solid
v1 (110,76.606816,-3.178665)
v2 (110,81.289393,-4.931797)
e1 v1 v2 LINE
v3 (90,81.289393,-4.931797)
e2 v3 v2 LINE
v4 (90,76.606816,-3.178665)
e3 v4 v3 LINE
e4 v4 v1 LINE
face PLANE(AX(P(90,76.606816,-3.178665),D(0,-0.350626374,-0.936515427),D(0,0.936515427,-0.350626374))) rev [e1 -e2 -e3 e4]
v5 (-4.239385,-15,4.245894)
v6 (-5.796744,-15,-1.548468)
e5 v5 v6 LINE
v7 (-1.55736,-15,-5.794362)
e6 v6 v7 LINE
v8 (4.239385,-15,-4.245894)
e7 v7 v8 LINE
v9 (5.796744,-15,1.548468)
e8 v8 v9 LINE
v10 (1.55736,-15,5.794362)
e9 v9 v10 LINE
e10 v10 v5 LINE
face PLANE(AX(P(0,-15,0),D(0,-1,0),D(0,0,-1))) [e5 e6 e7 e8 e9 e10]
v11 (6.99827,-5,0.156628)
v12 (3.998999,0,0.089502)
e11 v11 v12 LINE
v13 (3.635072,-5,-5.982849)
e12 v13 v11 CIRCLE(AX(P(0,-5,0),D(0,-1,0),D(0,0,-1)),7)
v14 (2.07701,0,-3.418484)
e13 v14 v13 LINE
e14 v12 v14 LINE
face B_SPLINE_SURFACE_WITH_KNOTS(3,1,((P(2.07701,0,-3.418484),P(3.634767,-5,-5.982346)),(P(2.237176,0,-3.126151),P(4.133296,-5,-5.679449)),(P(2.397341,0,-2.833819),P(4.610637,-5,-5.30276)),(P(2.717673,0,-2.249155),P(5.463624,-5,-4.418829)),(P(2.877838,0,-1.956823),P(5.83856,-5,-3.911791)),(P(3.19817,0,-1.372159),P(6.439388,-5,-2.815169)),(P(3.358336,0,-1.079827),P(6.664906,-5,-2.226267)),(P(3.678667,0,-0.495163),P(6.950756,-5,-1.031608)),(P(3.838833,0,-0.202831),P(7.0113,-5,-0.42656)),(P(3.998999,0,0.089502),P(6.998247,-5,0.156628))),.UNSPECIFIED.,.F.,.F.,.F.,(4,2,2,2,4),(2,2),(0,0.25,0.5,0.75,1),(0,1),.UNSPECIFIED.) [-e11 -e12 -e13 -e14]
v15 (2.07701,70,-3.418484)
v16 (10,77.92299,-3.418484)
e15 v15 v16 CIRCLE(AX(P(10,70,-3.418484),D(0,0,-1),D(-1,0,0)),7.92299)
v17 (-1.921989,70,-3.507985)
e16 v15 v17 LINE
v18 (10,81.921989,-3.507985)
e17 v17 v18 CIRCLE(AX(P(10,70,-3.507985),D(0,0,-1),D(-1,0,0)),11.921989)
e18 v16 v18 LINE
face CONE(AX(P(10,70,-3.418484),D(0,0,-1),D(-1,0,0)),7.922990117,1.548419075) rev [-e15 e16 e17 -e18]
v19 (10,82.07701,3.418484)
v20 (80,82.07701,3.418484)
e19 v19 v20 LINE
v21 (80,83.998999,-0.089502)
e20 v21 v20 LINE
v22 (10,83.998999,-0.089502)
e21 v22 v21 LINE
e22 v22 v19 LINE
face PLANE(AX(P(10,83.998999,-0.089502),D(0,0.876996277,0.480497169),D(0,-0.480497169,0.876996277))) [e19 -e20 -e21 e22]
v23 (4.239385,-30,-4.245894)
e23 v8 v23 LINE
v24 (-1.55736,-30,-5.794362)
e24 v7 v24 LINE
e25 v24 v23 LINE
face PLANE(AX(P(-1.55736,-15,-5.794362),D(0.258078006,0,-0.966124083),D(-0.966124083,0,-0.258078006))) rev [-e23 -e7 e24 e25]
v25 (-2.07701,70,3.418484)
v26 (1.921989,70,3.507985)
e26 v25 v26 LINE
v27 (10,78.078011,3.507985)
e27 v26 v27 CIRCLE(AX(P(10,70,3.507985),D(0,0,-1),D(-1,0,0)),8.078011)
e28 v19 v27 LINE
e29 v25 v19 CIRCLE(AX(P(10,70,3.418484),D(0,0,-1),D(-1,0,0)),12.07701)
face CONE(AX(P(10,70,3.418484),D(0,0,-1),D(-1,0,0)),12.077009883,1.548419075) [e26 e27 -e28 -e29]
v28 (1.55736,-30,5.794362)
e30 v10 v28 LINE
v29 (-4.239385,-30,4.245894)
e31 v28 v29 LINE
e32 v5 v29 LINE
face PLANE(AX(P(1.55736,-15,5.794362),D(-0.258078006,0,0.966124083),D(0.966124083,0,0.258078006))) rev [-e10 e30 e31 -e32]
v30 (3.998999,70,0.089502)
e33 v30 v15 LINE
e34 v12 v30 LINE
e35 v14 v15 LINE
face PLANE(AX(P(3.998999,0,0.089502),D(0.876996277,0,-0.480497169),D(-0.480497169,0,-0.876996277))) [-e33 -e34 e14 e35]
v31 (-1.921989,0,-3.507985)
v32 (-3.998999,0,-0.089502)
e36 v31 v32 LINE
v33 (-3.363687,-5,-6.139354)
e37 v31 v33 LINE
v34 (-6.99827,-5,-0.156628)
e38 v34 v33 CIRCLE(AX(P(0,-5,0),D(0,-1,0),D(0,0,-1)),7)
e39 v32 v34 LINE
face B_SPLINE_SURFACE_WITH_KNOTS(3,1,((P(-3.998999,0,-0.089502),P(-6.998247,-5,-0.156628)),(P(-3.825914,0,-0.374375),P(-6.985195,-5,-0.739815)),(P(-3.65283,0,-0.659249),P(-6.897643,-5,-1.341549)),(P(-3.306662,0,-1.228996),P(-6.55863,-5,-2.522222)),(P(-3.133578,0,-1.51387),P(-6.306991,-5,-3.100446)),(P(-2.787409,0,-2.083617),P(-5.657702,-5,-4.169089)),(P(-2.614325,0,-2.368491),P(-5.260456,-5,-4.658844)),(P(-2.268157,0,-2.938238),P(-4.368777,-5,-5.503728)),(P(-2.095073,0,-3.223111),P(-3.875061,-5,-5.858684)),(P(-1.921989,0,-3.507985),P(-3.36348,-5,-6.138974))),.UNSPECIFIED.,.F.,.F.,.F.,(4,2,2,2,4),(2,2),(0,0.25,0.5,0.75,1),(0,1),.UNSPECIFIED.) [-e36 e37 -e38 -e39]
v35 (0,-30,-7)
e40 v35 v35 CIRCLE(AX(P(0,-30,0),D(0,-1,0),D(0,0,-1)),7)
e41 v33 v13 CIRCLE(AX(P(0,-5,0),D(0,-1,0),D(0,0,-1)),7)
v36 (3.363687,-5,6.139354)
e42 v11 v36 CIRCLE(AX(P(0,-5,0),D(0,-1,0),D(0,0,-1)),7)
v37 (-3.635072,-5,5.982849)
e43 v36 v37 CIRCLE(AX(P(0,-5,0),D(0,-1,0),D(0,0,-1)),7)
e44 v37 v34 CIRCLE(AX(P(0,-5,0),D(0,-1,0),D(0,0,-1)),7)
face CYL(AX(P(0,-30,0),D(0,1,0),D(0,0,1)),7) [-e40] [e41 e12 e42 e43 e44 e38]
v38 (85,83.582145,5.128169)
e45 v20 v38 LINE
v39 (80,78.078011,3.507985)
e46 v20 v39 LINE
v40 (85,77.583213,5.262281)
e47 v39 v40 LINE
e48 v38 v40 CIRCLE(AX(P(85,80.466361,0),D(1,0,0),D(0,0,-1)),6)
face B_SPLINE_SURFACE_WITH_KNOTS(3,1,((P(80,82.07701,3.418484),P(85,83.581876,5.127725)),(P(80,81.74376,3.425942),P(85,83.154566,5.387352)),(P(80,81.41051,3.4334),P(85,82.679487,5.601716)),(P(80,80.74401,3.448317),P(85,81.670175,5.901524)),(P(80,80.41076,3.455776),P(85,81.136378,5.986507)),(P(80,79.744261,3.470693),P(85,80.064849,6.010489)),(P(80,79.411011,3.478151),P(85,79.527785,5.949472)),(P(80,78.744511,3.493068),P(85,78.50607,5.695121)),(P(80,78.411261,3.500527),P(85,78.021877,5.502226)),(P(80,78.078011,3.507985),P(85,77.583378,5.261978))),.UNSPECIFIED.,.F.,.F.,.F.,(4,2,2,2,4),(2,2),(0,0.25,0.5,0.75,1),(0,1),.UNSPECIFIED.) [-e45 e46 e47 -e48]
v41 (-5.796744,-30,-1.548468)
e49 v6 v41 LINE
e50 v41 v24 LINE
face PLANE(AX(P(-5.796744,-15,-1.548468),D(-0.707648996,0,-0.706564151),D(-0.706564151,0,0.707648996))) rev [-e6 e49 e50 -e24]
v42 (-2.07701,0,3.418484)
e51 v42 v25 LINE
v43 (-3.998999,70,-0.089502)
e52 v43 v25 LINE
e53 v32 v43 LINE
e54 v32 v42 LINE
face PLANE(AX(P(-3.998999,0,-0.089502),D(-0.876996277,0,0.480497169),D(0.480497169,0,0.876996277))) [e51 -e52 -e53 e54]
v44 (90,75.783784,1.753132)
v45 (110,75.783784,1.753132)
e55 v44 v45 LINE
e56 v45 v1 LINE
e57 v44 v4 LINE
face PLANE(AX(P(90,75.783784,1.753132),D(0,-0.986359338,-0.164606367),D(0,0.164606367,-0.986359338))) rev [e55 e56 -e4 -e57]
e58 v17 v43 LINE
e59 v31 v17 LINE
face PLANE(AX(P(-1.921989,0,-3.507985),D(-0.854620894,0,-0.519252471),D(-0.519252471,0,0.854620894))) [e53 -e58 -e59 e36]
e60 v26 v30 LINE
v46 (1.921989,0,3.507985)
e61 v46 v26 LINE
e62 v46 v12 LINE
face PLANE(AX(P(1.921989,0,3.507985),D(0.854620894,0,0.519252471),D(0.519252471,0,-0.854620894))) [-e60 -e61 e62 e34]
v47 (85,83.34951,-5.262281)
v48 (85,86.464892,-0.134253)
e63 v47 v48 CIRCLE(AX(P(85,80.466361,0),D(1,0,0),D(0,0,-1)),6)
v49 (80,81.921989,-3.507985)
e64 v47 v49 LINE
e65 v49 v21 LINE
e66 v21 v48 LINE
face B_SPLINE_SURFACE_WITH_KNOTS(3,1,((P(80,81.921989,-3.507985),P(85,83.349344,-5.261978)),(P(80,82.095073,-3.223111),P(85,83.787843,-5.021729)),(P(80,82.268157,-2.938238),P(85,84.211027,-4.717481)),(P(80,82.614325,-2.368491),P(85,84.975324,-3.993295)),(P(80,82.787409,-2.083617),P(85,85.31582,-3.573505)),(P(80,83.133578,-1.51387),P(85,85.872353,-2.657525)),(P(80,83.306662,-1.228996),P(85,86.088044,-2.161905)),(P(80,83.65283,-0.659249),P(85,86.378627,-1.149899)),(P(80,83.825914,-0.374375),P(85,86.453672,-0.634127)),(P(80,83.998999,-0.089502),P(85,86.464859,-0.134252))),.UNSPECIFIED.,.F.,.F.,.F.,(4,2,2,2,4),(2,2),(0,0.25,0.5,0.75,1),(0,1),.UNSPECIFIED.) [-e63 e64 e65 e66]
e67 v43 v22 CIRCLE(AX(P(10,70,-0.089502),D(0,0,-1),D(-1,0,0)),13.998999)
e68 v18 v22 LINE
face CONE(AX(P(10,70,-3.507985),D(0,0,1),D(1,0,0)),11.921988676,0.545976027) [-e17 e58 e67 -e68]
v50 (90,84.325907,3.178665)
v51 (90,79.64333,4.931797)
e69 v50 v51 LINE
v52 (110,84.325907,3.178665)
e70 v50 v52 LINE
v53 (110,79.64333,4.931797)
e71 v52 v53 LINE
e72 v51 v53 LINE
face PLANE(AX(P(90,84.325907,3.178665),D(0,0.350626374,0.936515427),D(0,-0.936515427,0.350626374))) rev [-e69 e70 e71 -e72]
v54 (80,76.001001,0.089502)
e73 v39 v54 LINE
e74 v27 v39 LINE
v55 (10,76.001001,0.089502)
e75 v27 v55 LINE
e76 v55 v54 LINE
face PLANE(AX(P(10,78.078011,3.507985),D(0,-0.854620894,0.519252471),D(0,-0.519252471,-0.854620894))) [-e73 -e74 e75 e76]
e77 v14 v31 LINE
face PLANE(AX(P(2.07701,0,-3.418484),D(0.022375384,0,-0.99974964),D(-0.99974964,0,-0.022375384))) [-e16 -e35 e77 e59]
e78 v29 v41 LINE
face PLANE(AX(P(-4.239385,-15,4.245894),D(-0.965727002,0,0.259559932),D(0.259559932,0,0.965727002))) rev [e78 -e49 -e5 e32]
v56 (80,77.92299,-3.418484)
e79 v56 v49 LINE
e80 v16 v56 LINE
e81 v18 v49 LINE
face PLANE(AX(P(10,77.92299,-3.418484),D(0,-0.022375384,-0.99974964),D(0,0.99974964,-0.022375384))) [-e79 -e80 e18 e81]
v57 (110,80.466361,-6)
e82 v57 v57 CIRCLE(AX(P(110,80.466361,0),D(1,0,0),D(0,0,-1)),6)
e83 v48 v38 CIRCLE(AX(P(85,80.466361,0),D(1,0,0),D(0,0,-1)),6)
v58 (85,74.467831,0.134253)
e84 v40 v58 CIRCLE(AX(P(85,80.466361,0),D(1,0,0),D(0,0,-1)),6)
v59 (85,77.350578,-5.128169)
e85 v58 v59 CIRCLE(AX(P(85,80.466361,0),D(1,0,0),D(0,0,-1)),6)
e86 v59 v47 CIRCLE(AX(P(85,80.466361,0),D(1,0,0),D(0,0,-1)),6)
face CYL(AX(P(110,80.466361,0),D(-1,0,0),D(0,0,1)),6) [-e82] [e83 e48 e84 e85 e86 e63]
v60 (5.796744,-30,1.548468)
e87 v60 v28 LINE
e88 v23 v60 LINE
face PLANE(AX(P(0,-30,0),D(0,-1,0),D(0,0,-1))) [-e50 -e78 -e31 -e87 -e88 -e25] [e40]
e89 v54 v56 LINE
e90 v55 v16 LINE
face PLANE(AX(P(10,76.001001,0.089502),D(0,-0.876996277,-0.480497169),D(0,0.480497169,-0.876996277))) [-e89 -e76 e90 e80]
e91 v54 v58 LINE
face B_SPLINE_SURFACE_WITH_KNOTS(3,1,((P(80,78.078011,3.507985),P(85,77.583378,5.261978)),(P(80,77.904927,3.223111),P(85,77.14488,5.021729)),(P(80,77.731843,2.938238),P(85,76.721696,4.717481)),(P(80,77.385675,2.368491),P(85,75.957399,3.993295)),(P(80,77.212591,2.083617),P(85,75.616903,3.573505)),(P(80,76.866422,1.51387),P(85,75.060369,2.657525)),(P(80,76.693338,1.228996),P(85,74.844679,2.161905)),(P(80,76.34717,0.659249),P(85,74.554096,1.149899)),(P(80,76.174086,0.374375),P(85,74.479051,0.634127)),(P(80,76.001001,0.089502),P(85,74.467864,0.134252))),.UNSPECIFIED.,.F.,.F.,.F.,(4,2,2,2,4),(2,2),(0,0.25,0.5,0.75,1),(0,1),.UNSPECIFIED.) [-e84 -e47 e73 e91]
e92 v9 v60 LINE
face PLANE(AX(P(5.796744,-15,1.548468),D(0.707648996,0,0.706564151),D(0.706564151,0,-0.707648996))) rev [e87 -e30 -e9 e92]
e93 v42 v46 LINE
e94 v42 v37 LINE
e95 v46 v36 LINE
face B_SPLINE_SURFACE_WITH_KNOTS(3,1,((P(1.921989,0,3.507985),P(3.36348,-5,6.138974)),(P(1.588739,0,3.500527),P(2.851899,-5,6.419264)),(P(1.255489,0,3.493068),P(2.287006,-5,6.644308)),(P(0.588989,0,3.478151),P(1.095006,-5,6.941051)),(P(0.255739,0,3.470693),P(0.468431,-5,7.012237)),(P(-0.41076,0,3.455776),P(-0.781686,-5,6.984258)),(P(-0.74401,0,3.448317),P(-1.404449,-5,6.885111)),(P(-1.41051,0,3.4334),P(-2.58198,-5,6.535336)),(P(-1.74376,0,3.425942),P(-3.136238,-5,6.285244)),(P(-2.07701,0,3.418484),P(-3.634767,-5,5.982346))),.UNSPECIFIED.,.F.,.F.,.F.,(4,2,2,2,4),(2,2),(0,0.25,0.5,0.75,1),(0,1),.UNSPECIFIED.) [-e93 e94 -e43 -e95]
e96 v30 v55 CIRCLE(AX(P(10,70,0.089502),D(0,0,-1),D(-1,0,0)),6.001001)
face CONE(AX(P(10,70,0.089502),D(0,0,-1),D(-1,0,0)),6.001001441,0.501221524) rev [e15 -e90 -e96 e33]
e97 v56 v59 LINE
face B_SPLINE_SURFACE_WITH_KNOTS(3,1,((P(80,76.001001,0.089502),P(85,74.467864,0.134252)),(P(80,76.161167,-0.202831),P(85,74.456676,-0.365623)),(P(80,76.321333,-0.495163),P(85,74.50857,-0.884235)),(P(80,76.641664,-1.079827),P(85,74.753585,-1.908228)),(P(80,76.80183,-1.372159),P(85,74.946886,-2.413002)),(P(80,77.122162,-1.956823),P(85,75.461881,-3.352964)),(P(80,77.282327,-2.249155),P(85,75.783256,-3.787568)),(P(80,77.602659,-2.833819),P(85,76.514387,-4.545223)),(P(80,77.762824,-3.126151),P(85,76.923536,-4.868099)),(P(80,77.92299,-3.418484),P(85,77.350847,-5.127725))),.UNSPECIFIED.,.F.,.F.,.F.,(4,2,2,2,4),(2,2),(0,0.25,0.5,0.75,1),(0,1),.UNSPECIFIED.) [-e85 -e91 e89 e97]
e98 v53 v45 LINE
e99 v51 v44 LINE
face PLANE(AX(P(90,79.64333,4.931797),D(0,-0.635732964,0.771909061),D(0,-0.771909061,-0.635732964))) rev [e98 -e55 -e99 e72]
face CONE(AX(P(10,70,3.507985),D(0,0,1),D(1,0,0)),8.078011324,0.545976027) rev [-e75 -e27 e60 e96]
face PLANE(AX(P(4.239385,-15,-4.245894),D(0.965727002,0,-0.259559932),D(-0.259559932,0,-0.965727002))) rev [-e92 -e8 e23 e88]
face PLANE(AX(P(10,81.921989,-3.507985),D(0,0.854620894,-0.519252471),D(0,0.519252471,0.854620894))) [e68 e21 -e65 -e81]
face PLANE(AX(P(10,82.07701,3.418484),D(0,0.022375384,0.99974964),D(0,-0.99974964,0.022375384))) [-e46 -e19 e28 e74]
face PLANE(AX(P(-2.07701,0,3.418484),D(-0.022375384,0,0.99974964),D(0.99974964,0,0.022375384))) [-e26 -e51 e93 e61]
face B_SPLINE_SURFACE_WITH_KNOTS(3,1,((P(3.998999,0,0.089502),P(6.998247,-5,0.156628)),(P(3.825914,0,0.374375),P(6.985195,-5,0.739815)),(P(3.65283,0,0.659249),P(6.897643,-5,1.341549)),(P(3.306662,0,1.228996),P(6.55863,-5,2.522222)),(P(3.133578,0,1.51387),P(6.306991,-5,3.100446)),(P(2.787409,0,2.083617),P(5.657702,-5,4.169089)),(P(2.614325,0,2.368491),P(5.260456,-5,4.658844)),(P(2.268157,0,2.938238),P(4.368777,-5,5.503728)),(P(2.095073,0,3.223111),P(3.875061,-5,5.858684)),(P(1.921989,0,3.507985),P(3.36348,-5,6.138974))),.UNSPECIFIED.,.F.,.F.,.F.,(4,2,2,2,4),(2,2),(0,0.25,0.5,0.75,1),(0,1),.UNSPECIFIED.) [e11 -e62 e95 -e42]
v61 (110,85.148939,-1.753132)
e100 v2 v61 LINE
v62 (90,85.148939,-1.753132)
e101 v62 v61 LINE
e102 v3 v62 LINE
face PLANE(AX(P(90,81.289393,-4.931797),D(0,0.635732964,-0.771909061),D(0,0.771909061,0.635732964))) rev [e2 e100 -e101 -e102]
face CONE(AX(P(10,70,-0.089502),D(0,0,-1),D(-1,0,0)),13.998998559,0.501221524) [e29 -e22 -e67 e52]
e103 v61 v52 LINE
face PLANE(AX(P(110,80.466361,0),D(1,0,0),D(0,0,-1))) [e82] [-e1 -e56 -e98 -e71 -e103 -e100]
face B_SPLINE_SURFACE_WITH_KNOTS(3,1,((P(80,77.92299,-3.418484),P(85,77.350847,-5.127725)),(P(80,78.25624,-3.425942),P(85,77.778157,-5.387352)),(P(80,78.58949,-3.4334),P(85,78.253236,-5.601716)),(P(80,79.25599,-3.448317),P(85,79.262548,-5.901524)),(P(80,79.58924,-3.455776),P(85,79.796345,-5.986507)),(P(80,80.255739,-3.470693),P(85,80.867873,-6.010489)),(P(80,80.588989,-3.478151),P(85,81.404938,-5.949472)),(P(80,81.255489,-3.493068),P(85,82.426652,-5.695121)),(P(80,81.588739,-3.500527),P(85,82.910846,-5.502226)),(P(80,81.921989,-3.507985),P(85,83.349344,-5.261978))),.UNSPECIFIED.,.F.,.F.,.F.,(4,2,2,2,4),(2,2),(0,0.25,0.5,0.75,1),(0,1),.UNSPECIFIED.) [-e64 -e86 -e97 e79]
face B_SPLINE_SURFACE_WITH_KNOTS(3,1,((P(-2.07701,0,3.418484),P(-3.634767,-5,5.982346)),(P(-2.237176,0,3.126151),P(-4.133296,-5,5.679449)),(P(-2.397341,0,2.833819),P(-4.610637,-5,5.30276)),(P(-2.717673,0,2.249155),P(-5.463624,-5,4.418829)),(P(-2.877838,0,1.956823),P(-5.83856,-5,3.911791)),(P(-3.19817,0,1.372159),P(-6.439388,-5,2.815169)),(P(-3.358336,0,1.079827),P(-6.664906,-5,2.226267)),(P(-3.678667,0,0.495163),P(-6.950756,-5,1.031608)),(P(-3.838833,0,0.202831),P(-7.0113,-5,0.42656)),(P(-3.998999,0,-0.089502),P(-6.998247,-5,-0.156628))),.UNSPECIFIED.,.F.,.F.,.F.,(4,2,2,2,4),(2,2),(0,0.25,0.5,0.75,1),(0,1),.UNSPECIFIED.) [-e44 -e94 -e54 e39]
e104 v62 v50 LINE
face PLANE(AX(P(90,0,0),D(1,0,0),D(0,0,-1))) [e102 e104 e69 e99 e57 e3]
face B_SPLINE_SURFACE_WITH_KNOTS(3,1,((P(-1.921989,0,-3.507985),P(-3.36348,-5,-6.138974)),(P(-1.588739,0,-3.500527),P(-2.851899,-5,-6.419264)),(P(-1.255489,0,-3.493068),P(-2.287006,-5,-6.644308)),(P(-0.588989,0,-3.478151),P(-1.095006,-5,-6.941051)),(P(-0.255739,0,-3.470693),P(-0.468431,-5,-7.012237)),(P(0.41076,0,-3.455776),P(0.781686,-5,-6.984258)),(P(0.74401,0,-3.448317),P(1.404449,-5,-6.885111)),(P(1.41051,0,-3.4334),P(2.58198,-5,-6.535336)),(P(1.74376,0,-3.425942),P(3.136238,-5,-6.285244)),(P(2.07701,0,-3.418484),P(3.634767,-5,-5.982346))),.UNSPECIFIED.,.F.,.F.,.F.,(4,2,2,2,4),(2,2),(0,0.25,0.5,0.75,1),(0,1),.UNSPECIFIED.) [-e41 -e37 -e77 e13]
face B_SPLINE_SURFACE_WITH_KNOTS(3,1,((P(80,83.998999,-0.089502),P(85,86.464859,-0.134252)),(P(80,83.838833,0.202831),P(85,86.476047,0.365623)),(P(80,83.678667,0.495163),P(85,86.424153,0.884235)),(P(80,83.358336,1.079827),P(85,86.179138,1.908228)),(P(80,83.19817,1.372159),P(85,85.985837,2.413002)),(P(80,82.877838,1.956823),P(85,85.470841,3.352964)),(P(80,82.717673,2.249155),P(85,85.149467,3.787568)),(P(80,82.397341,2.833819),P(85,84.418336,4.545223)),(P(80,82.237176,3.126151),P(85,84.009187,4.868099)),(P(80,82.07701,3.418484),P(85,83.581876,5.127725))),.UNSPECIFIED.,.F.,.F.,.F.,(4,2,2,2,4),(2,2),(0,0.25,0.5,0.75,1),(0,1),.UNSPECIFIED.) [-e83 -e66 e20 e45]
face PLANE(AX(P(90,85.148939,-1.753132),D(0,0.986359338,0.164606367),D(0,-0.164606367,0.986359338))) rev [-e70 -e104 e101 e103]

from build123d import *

# Parameters (mm, degrees)
SZKIC11_R                   = 6
DODANIE_WYCI_GNI_CIE2_DEPTH = 25
WYTNIJ_WYCI_GNI_CIE1_DEPTH  = 20
SZKIC17_R                   = 7
DODANIE_WYCI_GNI_CIE4_DEPTH = 25
WYTNIJ_WYCI_GNI_CIE2_DEPTH  = 15


with BuildPart() as part:
    # Wyciągnięcie po ścieżce3: sweep along a path in Szkic1
    with BuildLine(Plane.XY) as wyci_gni_cie_po_cie_ce3_path:
        Line((0, 0), (0, 70))
        ThreePointArc((0, 70), (2.928932188, 77.071067812), (10, 80))
        Line((10, 80), (80, 80))
    # Szkic3 → Wyciągnięcie po ścieżce3 (sweep)
    with BuildSketch(Plane(origin=(0, 0, 0), x_dir=(1, 0, 0), z_dir=(0, 1, 0))):
        Polygon((-1.921988676, 3.50798511), (-3.998998559, 0.089501536), (-2.077009883, -3.418483574), (1.921988676, -3.50798511), (3.998998559, -0.089501536), (2.077009883, 3.418483574), align=None)
    sweep(path=wyci_gni_cie_po_cie_ce3_path.line)

    # Wyciągnięcie po profilach3: read off the stored shape, not the designer's step
    # Wyciągnięcie po profilach3: loft between two sections, ruled curve by curve
    wyci_gni_cie_po_profilach3_from = [
        Edge.make_bspline([(80, 81.921988676, -3.50798511), (80, 82.095072833, -3.223111478), (80, 82.26815699, -2.938237847), (80, 82.614325304, -2.368490585), (80, 82.787409461, -2.083616954), (80, 83.133577774, -1.513869691), (80, 83.306661931, -1.22899606), (80, 83.652830245, -0.659248798), (80, 83.825914402, -0.374375167), (80, 83.998998559, -0.089501536)], [0, 0, 0, 0, 0.25, 0.25, 0.5, 0.5, 0.75, 0.75, 1, 1, 1, 1], 3),
        Edge.make_bspline([(80, 83.998998559, -0.089501536), (80, 83.838832836, 0.202830557), (80, 83.678667113, 0.495162649), (80, 83.358335667, 1.079826834), (80, 83.198169944, 1.372158927), (80, 82.877838498, 1.956823112), (80, 82.717672775, 2.249155204), (80, 82.397341329, 2.833819389), (80, 82.237175606, 3.126151482), (80, 82.077009883, 3.418483574)], [0, 0, 0, 0, 0.25, 0.25, 0.5, 0.5, 0.75, 0.75, 1, 1, 1, 1], 3),
        Edge.make_bspline([(80, 77.922990117, -3.418483574), (80, 78.256239997, -3.425942035), (80, 78.589489877, -3.433400497), (80, 79.255989637, -3.448317419), (80, 79.589239517, -3.455775881), (80, 80.255739276, -3.470692803), (80, 80.588989156, -3.478151264), (80, 81.255488916, -3.493068187), (80, 81.588738796, -3.500526648), (80, 81.921988676, -3.50798511)], [0, 0, 0, 0, 0.25, 0.25, 0.5, 0.5, 0.75, 0.75, 1, 1, 1, 1], 3),
        Edge.make_bspline([(80, 82.077009883, 3.418483574), (80, 81.743760003, 3.425942035), (80, 81.410510123, 3.433400497), (80, 80.744010363, 3.448317419), (80, 80.410760483, 3.455775881), (80, 79.744260724, 3.470692803), (80, 79.411010844, 3.478151264), (80, 78.744511084, 3.493068187), (80, 78.411261204, 3.500526648), (80, 78.078011324, 3.50798511)], [0, 0, 0, 0, 0.25, 0.25, 0.5, 0.5, 0.75, 0.75, 1, 1, 1, 1], 3),
        Edge.make_bspline([(80, 78.078011324, 3.50798511), (80, 77.904927167, 3.223111478), (80, 77.73184301, 2.938237847), (80, 77.385674696, 2.368490585), (80, 77.212590539, 2.083616954), (80, 76.866422226, 1.513869691), (80, 76.693338069, 1.22899606), (80, 76.347169755, 0.659248798), (80, 76.174085598, 0.374375167), (80, 76.001001441, 0.089501536)], [0, 0, 0, 0, 0.25, 0.25, 0.5, 0.5, 0.75, 0.75, 1, 1, 1, 1], 3),
        Edge.make_bspline([(80, 76.001001441, 0.089501536), (80, 76.161167164, -0.202830557), (80, 76.321332887, -0.495162649), (80, 76.641664333, -1.079826834), (80, 76.801830056, -1.372158927), (80, 77.122161502, -1.956823112), (80, 77.282327225, -2.249155204), (80, 77.602658671, -2.833819389), (80, 77.762824394, -3.126151482), (80, 77.922990117, -3.418483574)], [0, 0, 0, 0, 0.25, 0.25, 0.5, 0.5, 0.75, 0.75, 1, 1, 1, 1], 3),
    ]
    wyci_gni_cie_po_profilach3_to = [
        Edge.make_bspline([(85, 83.349344408, -5.261977664), (85, 83.787842547, -5.02172908), (85, 84.211027249, -4.717480921), (85, 84.975323877, -3.993295122), (85, 85.315820195, -3.573504781), (85, 85.872353316, -2.657524868), (85, 86.088044053, -2.161904874), (85, 86.37862671, -1.149898883), (85, 86.453671541, -0.634127123), (85, 86.464859233, -0.134252303)], [0, 0, 0, 0, 0.25, 0.25, 0.5, 0.5, 0.75, 0.75, 1, 1, 1, 1], 3),
        Edge.make_bspline([(85, 86.464859233, -0.134252303), (85, 86.476046925, 0.365622516), (85, 86.424152641, 0.884235299), (85, 86.179137656, 1.908228494), (85, 85.985836715, 2.413002125), (85, 85.470841402, 3.352963903), (85, 85.149467265, 3.787567557), (85, 84.418335696, 4.545222516), (85, 84.009186666, 4.868099126), (85, 83.581876219, 5.127725361)], [0, 0, 0, 0, 0.25, 0.25, 0.5, 0.5, 0.75, 0.75, 1, 1, 1, 1], 3),
        Edge.make_bspline([(85, 77.35084657, -5.127725361), (85, 77.778157016, -5.387351596), (85, 78.253236002, -5.601716219), (85, 79.262547615, -5.901523616), (85, 79.796344874, -5.986506906), (85, 80.867873308, -6.010488771), (85, 81.404938182, -5.949472432), (85, 82.426652408, -5.695121399), (85, 82.91084627, -5.502226249), (85, 83.349344408, -5.261977664)], [0, 0, 0, 0, 0.25, 0.25, 0.5, 0.5, 0.75, 0.75, 1, 1, 1, 1], 3),
        Edge.make_bspline([(85, 83.581876219, 5.127725361), (85, 83.154565772, 5.387351596), (85, 82.679486786, 5.601716219), (85, 81.670175173, 5.901523616), (85, 81.136377915, 5.986506906), (85, 80.06484948, 6.010488771), (85, 79.527784606, 5.949472432), (85, 78.506070381, 5.695121399), (85, 78.021876519, 5.502226249), (85, 77.58337838, 5.261977664)], [0, 0, 0, 0, 0.25, 0.25, 0.5, 0.5, 0.75, 0.75, 1, 1, 1, 1], 3),
        Edge.make_bspline([(85, 77.58337838, 5.261977664), (85, 77.144880242, 5.02172908), (85, 76.721695539, 4.717480921), (85, 75.957398911, 3.993295122), (85, 75.616902594, 3.573504781), (85, 75.060369473, 2.657524868), (85, 74.844678735, 2.161904874), (85, 74.554096079, 1.149898883), (85, 74.479051248, 0.634127123), (85, 74.467863556, 0.134252303)], [0, 0, 0, 0, 0.25, 0.25, 0.5, 0.5, 0.75, 0.75, 1, 1, 1, 1], 3),
        Edge.make_bspline([(85, 74.467863556, 0.134252303), (85, 74.456675864, -0.365622516), (85, 74.508570148, -0.884235299), (85, 74.753585133, -1.908228494), (85, 74.946886073, -2.413002125), (85, 75.461881387, -3.352963903), (85, 75.783255523, -3.787567557), (85, 76.514387092, -4.545222516), (85, 76.923536123, -4.868099126), (85, 77.35084657, -5.127725361)], [0, 0, 0, 0, 0.25, 0.25, 0.5, 0.5, 0.75, 0.75, 1, 1, 1, 1], 3),
    ]
    wyci_gni_cie_po_profilach3 = Solid(Shell([*[Face.make_surface_from_curves(wyci_gni_cie_po_profilach3_from[k], wyci_gni_cie_po_profilach3_to[k]) for k in range(6)], Face(Wire(wyci_gni_cie_po_profilach3_from)), Face(Wire(wyci_gni_cie_po_profilach3_to))]))
    add(wyci_gni_cie_po_profilach3)

    # Szkic11 → Dodanie-wyciągnięcie2 (add)
    with BuildSketch(Plane(origin=(85, 0, 0), x_dir=(0, 0, -1), z_dir=(1, 0, 0))):
        with Locations(Location((0, 80.466361394, 0), (0, 0, 208.71786867))):
            Circle(SZKIC11_R)
    extrude(amount=DODANIE_WYCI_GNI_CIE2_DEPTH)

    # Szkic12 → Wytnij-wyciągnięcie1 (cut)
    with BuildSketch(Plane(origin=(110, 0, 0), x_dir=(0, 0, -1), z_dir=(1, 0, 0))):
        Polygon((-3.178664822, 84.325906698), (-4.931796691, 79.643329561), (-1.753131869, 75.783784257), (3.178664822, 76.60681609), (4.931796691, 81.289393228), (1.753131869, 85.148938532), align=None)
    extrude(amount=-WYTNIJ_WYCI_GNI_CIE1_DEPTH, mode=Mode.SUBTRACT)

    # Wyciągnięcie po profilach4: read off the stored shape, not the designer's step
    # Wyciągnięcie po profilach4: loft between two sections, ruled curve by curve
    wyci_gni_cie_po_profilach4_from = [
        Edge.make_bspline([(3.998998559, 0, 0.089501536), (3.825914402, 0, 0.374375167), (3.652830245, 0, 0.659248798), (3.306661931, 0, 1.22899606), (3.133577774, 0, 1.513869691), (2.787409461, 0, 2.083616954), (2.614325304, 0, 2.368490585), (2.26815699, 0, 2.938237847), (2.095072833, 0, 3.223111478), (1.921988676, 0, 3.50798511)], [0, 0, 0, 0, 0.25, 0.25, 0.5, 0.5, 0.75, 0.75, 1, 1, 1, 1], 3),
        Edge.make_bspline([(1.921988676, 0, 3.50798511), (1.588738796, 0, 3.500526648), (1.255488916, 0, 3.493068187), (0.588989156, 0, 3.478151264), (0.255739276, 0, 3.470692803), (-0.410760483, 0, 3.455775881), (-0.744010363, 0, 3.448317419), (-1.410510123, 0, 3.433400497), (-1.743760003, 0, 3.425942035), (-2.077009883, 0, 3.418483574)], [0, 0, 0, 0, 0.25, 0.25, 0.5, 0.5, 0.75, 0.75, 1, 1, 1, 1], 3),
        Edge.make_bspline([(2.077009883, 0, -3.418483574), (2.237175606, 0, -3.126151482), (2.397341329, 0, -2.833819389), (2.717672775, 0, -2.249155204), (2.877838498, 0, -1.956823112), (3.198169944, 0, -1.372158927), (3.358335667, 0, -1.079826834), (3.678667113, 0, -0.495162649), (3.838832836, 0, -0.202830557), (3.998998559, 0, 0.089501536)], [0, 0, 0, 0, 0.25, 0.25, 0.5, 0.5, 0.75, 0.75, 1, 1, 1, 1], 3),
        Edge.make_bspline([(-2.077009883, 0, 3.418483574), (-2.237175606, 0, 3.126151482), (-2.397341329, 0, 2.833819389), (-2.717672775, 0, 2.249155204), (-2.877838498, 0, 1.956823112), (-3.198169944, 0, 1.372158927), (-3.358335667, 0, 1.079826834), (-3.678667113, 0, 0.495162649), (-3.838832836, 0, 0.202830557), (-3.998998559, 0, -0.089501536)], [0, 0, 0, 0, 0.25, 0.25, 0.5, 0.5, 0.75, 0.75, 1, 1, 1, 1], 3),
        Edge.make_bspline([(-3.998998559, 0, -0.089501536), (-3.825914402, 0, -0.374375167), (-3.652830245, 0, -0.659248798), (-3.306661931, 0, -1.22899606), (-3.133577774, 0, -1.513869691), (-2.787409461, 0, -2.083616954), (-2.614325304, 0, -2.368490585), (-2.26815699, 0, -2.938237847), (-2.095072833, 0, -3.223111478), (-1.921988676, 0, -3.50798511)], [0, 0, 0, 0, 0.25, 0.25, 0.5, 0.5, 0.75, 0.75, 1, 1, 1, 1], 3),
        Edge.make_bspline([(-1.921988676, 0, -3.50798511), (-1.588738796, 0, -3.500526648), (-1.255488916, 0, -3.493068187), (-0.588989156, 0, -3.478151264), (-0.255739276, 0, -3.470692803), (0.410760483, 0, -3.455775881), (0.744010363, 0, -3.448317419), (1.410510123, 0, -3.433400497), (1.743760003, 0, -3.425942035), (2.077009883, 0, -3.418483574)], [0, 0, 0, 0, 0.25, 0.25, 0.5, 0.5, 0.75, 0.75, 1, 1, 1, 1], 3),
    ]
    wyci_gni_cie_po_profilach4_to = [
        Edge.make_bspline([(6.998247478, -5, 0.156627687), (6.985195171, -5, 0.739814977), (6.897642868, -5, 1.341548697), (6.558629769, -5, 2.522222353), (6.306990575, -5, 3.100445679), (5.657701934, -5, 4.169088911), (5.26045623, -5, 4.658844309), (4.368776831, -5, 5.503727741), (3.875061345, -5, 5.858683927), (3.363480183, -5, 6.138973942)], [0, 0, 0, 0, 0.25, 0.25, 0.5, 0.5, 0.75, 0.75, 1, 1, 1, 1], 3),
        Edge.make_bspline([(3.363480183, -5, 6.138973942), (2.851899021, -5, 6.419263957), (2.287006182, -5, 6.644308298), (1.095006252, -5, 6.94105117), (0.468430566, -5, 7.012236899), (-0.781685941, -5, 6.984258058), (-1.404449409, -5, 6.885110885), (-2.581979624, -5, 6.535335589), (-3.136238441, -5, 6.285243529), (-3.634767295, -5, 5.982346255)], [0, 0, 0, 0, 0.25, 0.25, 0.5, 0.5, 0.75, 0.75, 1, 1, 1, 1], 3),
        Edge.make_bspline([(3.634767295, -5, -5.982346255), (4.13329615, -5, -5.67944898), (4.610636686, -5, -5.302759602), (5.463623516, -5, -4.418828817), (5.838560009, -5, -3.91179122), (6.439387875, -5, -2.815169146), (6.664905639, -5, -2.226266576), (6.950756454, -5, -1.031607848), (7.011299786, -5, -0.426559603), (6.998247478, -5, 0.156627687)], [0, 0, 0, 0, 0.25, 0.25, 0.5, 0.5, 0.75, 0.75, 1, 1, 1, 1], 3),
        Edge.make_bspline([(-3.634767295, -5, 5.982346255), (-4.13329615, -5, 5.67944898), (-4.610636686, -5, 5.302759602), (-5.463623516, -5, 4.418828817), (-5.838560009, -5, 3.91179122), (-6.439387875, -5, 2.815169146), (-6.664905639, -5, 2.226266576), (-6.950756454, -5, 1.031607848), (-7.011299786, -5, 0.426559603), (-6.998247478, -5, -0.156627687)], [0, 0, 0, 0, 0.25, 0.25, 0.5, 0.5, 0.75, 0.75, 1, 1, 1, 1], 3),
        Edge.make_bspline([(-6.998247478, -5, -0.156627687), (-6.985195171, -5, -0.739814977), (-6.897642868, -5, -1.341548697), (-6.558629769, -5, -2.522222353), (-6.306990575, -5, -3.100445679), (-5.657701934, -5, -4.169088911), (-5.26045623, -5, -4.658844309), (-4.368776831, -5, -5.503727741), (-3.875061345, -5, -5.858683927), (-3.363480183, -5, -6.138973942)], [0, 0, 0, 0, 0.25, 0.25, 0.5, 0.5, 0.75, 0.75, 1, 1, 1, 1], 3),
        Edge.make_bspline([(-3.363480183, -5, -6.138973942), (-2.851899021, -5, -6.419263957), (-2.287006182, -5, -6.644308298), (-1.095006252, -5, -6.94105117), (-0.468430566, -5, -7.012236899), (0.781685941, -5, -6.984258058), (1.404449409, -5, -6.885110885), (2.581979624, -5, -6.535335589), (3.136238441, -5, -6.285243529), (3.634767295, -5, -5.982346255)], [0, 0, 0, 0, 0.25, 0.25, 0.5, 0.5, 0.75, 0.75, 1, 1, 1, 1], 3),
    ]
    wyci_gni_cie_po_profilach4 = Solid(Shell([*[Face.make_surface_from_curves(wyci_gni_cie_po_profilach4_from[k], wyci_gni_cie_po_profilach4_to[k]) for k in range(6)], Face(Wire(wyci_gni_cie_po_profilach4_from)), Face(Wire(wyci_gni_cie_po_profilach4_to))]))
    add(wyci_gni_cie_po_profilach4)

    # Szkic17 → Dodanie-wyciągnięcie4 (add)
    with BuildSketch(Plane(origin=(0, -5, 0), x_dir=(-1, 0, 0), z_dir=(0, -1, 0))):
        with Locations(Location((0, 0, 0), (0, 0, 241.282131678))):
            Circle(SZKIC17_R)
    extrude(amount=DODANIE_WYCI_GNI_CIE4_DEPTH)

    # Szkic18 → Wytnij-wyciągnięcie2 (cut)
    with BuildSketch(Plane.XZ.offset(30)):
        Polygon((-4.239384903, 4.245893974), (-5.796744495, -1.548468036), (-1.557359592, -5.79436201), (4.239384903, -4.245893974), (5.796744495, 1.548468036), (1.557359592, 5.79436201), align=None)
    extrude(amount=-WYTNIJ_WYCI_GNI_CIE2_DEPTH, mode=Mode.SUBTRACT)


solid = part.part
